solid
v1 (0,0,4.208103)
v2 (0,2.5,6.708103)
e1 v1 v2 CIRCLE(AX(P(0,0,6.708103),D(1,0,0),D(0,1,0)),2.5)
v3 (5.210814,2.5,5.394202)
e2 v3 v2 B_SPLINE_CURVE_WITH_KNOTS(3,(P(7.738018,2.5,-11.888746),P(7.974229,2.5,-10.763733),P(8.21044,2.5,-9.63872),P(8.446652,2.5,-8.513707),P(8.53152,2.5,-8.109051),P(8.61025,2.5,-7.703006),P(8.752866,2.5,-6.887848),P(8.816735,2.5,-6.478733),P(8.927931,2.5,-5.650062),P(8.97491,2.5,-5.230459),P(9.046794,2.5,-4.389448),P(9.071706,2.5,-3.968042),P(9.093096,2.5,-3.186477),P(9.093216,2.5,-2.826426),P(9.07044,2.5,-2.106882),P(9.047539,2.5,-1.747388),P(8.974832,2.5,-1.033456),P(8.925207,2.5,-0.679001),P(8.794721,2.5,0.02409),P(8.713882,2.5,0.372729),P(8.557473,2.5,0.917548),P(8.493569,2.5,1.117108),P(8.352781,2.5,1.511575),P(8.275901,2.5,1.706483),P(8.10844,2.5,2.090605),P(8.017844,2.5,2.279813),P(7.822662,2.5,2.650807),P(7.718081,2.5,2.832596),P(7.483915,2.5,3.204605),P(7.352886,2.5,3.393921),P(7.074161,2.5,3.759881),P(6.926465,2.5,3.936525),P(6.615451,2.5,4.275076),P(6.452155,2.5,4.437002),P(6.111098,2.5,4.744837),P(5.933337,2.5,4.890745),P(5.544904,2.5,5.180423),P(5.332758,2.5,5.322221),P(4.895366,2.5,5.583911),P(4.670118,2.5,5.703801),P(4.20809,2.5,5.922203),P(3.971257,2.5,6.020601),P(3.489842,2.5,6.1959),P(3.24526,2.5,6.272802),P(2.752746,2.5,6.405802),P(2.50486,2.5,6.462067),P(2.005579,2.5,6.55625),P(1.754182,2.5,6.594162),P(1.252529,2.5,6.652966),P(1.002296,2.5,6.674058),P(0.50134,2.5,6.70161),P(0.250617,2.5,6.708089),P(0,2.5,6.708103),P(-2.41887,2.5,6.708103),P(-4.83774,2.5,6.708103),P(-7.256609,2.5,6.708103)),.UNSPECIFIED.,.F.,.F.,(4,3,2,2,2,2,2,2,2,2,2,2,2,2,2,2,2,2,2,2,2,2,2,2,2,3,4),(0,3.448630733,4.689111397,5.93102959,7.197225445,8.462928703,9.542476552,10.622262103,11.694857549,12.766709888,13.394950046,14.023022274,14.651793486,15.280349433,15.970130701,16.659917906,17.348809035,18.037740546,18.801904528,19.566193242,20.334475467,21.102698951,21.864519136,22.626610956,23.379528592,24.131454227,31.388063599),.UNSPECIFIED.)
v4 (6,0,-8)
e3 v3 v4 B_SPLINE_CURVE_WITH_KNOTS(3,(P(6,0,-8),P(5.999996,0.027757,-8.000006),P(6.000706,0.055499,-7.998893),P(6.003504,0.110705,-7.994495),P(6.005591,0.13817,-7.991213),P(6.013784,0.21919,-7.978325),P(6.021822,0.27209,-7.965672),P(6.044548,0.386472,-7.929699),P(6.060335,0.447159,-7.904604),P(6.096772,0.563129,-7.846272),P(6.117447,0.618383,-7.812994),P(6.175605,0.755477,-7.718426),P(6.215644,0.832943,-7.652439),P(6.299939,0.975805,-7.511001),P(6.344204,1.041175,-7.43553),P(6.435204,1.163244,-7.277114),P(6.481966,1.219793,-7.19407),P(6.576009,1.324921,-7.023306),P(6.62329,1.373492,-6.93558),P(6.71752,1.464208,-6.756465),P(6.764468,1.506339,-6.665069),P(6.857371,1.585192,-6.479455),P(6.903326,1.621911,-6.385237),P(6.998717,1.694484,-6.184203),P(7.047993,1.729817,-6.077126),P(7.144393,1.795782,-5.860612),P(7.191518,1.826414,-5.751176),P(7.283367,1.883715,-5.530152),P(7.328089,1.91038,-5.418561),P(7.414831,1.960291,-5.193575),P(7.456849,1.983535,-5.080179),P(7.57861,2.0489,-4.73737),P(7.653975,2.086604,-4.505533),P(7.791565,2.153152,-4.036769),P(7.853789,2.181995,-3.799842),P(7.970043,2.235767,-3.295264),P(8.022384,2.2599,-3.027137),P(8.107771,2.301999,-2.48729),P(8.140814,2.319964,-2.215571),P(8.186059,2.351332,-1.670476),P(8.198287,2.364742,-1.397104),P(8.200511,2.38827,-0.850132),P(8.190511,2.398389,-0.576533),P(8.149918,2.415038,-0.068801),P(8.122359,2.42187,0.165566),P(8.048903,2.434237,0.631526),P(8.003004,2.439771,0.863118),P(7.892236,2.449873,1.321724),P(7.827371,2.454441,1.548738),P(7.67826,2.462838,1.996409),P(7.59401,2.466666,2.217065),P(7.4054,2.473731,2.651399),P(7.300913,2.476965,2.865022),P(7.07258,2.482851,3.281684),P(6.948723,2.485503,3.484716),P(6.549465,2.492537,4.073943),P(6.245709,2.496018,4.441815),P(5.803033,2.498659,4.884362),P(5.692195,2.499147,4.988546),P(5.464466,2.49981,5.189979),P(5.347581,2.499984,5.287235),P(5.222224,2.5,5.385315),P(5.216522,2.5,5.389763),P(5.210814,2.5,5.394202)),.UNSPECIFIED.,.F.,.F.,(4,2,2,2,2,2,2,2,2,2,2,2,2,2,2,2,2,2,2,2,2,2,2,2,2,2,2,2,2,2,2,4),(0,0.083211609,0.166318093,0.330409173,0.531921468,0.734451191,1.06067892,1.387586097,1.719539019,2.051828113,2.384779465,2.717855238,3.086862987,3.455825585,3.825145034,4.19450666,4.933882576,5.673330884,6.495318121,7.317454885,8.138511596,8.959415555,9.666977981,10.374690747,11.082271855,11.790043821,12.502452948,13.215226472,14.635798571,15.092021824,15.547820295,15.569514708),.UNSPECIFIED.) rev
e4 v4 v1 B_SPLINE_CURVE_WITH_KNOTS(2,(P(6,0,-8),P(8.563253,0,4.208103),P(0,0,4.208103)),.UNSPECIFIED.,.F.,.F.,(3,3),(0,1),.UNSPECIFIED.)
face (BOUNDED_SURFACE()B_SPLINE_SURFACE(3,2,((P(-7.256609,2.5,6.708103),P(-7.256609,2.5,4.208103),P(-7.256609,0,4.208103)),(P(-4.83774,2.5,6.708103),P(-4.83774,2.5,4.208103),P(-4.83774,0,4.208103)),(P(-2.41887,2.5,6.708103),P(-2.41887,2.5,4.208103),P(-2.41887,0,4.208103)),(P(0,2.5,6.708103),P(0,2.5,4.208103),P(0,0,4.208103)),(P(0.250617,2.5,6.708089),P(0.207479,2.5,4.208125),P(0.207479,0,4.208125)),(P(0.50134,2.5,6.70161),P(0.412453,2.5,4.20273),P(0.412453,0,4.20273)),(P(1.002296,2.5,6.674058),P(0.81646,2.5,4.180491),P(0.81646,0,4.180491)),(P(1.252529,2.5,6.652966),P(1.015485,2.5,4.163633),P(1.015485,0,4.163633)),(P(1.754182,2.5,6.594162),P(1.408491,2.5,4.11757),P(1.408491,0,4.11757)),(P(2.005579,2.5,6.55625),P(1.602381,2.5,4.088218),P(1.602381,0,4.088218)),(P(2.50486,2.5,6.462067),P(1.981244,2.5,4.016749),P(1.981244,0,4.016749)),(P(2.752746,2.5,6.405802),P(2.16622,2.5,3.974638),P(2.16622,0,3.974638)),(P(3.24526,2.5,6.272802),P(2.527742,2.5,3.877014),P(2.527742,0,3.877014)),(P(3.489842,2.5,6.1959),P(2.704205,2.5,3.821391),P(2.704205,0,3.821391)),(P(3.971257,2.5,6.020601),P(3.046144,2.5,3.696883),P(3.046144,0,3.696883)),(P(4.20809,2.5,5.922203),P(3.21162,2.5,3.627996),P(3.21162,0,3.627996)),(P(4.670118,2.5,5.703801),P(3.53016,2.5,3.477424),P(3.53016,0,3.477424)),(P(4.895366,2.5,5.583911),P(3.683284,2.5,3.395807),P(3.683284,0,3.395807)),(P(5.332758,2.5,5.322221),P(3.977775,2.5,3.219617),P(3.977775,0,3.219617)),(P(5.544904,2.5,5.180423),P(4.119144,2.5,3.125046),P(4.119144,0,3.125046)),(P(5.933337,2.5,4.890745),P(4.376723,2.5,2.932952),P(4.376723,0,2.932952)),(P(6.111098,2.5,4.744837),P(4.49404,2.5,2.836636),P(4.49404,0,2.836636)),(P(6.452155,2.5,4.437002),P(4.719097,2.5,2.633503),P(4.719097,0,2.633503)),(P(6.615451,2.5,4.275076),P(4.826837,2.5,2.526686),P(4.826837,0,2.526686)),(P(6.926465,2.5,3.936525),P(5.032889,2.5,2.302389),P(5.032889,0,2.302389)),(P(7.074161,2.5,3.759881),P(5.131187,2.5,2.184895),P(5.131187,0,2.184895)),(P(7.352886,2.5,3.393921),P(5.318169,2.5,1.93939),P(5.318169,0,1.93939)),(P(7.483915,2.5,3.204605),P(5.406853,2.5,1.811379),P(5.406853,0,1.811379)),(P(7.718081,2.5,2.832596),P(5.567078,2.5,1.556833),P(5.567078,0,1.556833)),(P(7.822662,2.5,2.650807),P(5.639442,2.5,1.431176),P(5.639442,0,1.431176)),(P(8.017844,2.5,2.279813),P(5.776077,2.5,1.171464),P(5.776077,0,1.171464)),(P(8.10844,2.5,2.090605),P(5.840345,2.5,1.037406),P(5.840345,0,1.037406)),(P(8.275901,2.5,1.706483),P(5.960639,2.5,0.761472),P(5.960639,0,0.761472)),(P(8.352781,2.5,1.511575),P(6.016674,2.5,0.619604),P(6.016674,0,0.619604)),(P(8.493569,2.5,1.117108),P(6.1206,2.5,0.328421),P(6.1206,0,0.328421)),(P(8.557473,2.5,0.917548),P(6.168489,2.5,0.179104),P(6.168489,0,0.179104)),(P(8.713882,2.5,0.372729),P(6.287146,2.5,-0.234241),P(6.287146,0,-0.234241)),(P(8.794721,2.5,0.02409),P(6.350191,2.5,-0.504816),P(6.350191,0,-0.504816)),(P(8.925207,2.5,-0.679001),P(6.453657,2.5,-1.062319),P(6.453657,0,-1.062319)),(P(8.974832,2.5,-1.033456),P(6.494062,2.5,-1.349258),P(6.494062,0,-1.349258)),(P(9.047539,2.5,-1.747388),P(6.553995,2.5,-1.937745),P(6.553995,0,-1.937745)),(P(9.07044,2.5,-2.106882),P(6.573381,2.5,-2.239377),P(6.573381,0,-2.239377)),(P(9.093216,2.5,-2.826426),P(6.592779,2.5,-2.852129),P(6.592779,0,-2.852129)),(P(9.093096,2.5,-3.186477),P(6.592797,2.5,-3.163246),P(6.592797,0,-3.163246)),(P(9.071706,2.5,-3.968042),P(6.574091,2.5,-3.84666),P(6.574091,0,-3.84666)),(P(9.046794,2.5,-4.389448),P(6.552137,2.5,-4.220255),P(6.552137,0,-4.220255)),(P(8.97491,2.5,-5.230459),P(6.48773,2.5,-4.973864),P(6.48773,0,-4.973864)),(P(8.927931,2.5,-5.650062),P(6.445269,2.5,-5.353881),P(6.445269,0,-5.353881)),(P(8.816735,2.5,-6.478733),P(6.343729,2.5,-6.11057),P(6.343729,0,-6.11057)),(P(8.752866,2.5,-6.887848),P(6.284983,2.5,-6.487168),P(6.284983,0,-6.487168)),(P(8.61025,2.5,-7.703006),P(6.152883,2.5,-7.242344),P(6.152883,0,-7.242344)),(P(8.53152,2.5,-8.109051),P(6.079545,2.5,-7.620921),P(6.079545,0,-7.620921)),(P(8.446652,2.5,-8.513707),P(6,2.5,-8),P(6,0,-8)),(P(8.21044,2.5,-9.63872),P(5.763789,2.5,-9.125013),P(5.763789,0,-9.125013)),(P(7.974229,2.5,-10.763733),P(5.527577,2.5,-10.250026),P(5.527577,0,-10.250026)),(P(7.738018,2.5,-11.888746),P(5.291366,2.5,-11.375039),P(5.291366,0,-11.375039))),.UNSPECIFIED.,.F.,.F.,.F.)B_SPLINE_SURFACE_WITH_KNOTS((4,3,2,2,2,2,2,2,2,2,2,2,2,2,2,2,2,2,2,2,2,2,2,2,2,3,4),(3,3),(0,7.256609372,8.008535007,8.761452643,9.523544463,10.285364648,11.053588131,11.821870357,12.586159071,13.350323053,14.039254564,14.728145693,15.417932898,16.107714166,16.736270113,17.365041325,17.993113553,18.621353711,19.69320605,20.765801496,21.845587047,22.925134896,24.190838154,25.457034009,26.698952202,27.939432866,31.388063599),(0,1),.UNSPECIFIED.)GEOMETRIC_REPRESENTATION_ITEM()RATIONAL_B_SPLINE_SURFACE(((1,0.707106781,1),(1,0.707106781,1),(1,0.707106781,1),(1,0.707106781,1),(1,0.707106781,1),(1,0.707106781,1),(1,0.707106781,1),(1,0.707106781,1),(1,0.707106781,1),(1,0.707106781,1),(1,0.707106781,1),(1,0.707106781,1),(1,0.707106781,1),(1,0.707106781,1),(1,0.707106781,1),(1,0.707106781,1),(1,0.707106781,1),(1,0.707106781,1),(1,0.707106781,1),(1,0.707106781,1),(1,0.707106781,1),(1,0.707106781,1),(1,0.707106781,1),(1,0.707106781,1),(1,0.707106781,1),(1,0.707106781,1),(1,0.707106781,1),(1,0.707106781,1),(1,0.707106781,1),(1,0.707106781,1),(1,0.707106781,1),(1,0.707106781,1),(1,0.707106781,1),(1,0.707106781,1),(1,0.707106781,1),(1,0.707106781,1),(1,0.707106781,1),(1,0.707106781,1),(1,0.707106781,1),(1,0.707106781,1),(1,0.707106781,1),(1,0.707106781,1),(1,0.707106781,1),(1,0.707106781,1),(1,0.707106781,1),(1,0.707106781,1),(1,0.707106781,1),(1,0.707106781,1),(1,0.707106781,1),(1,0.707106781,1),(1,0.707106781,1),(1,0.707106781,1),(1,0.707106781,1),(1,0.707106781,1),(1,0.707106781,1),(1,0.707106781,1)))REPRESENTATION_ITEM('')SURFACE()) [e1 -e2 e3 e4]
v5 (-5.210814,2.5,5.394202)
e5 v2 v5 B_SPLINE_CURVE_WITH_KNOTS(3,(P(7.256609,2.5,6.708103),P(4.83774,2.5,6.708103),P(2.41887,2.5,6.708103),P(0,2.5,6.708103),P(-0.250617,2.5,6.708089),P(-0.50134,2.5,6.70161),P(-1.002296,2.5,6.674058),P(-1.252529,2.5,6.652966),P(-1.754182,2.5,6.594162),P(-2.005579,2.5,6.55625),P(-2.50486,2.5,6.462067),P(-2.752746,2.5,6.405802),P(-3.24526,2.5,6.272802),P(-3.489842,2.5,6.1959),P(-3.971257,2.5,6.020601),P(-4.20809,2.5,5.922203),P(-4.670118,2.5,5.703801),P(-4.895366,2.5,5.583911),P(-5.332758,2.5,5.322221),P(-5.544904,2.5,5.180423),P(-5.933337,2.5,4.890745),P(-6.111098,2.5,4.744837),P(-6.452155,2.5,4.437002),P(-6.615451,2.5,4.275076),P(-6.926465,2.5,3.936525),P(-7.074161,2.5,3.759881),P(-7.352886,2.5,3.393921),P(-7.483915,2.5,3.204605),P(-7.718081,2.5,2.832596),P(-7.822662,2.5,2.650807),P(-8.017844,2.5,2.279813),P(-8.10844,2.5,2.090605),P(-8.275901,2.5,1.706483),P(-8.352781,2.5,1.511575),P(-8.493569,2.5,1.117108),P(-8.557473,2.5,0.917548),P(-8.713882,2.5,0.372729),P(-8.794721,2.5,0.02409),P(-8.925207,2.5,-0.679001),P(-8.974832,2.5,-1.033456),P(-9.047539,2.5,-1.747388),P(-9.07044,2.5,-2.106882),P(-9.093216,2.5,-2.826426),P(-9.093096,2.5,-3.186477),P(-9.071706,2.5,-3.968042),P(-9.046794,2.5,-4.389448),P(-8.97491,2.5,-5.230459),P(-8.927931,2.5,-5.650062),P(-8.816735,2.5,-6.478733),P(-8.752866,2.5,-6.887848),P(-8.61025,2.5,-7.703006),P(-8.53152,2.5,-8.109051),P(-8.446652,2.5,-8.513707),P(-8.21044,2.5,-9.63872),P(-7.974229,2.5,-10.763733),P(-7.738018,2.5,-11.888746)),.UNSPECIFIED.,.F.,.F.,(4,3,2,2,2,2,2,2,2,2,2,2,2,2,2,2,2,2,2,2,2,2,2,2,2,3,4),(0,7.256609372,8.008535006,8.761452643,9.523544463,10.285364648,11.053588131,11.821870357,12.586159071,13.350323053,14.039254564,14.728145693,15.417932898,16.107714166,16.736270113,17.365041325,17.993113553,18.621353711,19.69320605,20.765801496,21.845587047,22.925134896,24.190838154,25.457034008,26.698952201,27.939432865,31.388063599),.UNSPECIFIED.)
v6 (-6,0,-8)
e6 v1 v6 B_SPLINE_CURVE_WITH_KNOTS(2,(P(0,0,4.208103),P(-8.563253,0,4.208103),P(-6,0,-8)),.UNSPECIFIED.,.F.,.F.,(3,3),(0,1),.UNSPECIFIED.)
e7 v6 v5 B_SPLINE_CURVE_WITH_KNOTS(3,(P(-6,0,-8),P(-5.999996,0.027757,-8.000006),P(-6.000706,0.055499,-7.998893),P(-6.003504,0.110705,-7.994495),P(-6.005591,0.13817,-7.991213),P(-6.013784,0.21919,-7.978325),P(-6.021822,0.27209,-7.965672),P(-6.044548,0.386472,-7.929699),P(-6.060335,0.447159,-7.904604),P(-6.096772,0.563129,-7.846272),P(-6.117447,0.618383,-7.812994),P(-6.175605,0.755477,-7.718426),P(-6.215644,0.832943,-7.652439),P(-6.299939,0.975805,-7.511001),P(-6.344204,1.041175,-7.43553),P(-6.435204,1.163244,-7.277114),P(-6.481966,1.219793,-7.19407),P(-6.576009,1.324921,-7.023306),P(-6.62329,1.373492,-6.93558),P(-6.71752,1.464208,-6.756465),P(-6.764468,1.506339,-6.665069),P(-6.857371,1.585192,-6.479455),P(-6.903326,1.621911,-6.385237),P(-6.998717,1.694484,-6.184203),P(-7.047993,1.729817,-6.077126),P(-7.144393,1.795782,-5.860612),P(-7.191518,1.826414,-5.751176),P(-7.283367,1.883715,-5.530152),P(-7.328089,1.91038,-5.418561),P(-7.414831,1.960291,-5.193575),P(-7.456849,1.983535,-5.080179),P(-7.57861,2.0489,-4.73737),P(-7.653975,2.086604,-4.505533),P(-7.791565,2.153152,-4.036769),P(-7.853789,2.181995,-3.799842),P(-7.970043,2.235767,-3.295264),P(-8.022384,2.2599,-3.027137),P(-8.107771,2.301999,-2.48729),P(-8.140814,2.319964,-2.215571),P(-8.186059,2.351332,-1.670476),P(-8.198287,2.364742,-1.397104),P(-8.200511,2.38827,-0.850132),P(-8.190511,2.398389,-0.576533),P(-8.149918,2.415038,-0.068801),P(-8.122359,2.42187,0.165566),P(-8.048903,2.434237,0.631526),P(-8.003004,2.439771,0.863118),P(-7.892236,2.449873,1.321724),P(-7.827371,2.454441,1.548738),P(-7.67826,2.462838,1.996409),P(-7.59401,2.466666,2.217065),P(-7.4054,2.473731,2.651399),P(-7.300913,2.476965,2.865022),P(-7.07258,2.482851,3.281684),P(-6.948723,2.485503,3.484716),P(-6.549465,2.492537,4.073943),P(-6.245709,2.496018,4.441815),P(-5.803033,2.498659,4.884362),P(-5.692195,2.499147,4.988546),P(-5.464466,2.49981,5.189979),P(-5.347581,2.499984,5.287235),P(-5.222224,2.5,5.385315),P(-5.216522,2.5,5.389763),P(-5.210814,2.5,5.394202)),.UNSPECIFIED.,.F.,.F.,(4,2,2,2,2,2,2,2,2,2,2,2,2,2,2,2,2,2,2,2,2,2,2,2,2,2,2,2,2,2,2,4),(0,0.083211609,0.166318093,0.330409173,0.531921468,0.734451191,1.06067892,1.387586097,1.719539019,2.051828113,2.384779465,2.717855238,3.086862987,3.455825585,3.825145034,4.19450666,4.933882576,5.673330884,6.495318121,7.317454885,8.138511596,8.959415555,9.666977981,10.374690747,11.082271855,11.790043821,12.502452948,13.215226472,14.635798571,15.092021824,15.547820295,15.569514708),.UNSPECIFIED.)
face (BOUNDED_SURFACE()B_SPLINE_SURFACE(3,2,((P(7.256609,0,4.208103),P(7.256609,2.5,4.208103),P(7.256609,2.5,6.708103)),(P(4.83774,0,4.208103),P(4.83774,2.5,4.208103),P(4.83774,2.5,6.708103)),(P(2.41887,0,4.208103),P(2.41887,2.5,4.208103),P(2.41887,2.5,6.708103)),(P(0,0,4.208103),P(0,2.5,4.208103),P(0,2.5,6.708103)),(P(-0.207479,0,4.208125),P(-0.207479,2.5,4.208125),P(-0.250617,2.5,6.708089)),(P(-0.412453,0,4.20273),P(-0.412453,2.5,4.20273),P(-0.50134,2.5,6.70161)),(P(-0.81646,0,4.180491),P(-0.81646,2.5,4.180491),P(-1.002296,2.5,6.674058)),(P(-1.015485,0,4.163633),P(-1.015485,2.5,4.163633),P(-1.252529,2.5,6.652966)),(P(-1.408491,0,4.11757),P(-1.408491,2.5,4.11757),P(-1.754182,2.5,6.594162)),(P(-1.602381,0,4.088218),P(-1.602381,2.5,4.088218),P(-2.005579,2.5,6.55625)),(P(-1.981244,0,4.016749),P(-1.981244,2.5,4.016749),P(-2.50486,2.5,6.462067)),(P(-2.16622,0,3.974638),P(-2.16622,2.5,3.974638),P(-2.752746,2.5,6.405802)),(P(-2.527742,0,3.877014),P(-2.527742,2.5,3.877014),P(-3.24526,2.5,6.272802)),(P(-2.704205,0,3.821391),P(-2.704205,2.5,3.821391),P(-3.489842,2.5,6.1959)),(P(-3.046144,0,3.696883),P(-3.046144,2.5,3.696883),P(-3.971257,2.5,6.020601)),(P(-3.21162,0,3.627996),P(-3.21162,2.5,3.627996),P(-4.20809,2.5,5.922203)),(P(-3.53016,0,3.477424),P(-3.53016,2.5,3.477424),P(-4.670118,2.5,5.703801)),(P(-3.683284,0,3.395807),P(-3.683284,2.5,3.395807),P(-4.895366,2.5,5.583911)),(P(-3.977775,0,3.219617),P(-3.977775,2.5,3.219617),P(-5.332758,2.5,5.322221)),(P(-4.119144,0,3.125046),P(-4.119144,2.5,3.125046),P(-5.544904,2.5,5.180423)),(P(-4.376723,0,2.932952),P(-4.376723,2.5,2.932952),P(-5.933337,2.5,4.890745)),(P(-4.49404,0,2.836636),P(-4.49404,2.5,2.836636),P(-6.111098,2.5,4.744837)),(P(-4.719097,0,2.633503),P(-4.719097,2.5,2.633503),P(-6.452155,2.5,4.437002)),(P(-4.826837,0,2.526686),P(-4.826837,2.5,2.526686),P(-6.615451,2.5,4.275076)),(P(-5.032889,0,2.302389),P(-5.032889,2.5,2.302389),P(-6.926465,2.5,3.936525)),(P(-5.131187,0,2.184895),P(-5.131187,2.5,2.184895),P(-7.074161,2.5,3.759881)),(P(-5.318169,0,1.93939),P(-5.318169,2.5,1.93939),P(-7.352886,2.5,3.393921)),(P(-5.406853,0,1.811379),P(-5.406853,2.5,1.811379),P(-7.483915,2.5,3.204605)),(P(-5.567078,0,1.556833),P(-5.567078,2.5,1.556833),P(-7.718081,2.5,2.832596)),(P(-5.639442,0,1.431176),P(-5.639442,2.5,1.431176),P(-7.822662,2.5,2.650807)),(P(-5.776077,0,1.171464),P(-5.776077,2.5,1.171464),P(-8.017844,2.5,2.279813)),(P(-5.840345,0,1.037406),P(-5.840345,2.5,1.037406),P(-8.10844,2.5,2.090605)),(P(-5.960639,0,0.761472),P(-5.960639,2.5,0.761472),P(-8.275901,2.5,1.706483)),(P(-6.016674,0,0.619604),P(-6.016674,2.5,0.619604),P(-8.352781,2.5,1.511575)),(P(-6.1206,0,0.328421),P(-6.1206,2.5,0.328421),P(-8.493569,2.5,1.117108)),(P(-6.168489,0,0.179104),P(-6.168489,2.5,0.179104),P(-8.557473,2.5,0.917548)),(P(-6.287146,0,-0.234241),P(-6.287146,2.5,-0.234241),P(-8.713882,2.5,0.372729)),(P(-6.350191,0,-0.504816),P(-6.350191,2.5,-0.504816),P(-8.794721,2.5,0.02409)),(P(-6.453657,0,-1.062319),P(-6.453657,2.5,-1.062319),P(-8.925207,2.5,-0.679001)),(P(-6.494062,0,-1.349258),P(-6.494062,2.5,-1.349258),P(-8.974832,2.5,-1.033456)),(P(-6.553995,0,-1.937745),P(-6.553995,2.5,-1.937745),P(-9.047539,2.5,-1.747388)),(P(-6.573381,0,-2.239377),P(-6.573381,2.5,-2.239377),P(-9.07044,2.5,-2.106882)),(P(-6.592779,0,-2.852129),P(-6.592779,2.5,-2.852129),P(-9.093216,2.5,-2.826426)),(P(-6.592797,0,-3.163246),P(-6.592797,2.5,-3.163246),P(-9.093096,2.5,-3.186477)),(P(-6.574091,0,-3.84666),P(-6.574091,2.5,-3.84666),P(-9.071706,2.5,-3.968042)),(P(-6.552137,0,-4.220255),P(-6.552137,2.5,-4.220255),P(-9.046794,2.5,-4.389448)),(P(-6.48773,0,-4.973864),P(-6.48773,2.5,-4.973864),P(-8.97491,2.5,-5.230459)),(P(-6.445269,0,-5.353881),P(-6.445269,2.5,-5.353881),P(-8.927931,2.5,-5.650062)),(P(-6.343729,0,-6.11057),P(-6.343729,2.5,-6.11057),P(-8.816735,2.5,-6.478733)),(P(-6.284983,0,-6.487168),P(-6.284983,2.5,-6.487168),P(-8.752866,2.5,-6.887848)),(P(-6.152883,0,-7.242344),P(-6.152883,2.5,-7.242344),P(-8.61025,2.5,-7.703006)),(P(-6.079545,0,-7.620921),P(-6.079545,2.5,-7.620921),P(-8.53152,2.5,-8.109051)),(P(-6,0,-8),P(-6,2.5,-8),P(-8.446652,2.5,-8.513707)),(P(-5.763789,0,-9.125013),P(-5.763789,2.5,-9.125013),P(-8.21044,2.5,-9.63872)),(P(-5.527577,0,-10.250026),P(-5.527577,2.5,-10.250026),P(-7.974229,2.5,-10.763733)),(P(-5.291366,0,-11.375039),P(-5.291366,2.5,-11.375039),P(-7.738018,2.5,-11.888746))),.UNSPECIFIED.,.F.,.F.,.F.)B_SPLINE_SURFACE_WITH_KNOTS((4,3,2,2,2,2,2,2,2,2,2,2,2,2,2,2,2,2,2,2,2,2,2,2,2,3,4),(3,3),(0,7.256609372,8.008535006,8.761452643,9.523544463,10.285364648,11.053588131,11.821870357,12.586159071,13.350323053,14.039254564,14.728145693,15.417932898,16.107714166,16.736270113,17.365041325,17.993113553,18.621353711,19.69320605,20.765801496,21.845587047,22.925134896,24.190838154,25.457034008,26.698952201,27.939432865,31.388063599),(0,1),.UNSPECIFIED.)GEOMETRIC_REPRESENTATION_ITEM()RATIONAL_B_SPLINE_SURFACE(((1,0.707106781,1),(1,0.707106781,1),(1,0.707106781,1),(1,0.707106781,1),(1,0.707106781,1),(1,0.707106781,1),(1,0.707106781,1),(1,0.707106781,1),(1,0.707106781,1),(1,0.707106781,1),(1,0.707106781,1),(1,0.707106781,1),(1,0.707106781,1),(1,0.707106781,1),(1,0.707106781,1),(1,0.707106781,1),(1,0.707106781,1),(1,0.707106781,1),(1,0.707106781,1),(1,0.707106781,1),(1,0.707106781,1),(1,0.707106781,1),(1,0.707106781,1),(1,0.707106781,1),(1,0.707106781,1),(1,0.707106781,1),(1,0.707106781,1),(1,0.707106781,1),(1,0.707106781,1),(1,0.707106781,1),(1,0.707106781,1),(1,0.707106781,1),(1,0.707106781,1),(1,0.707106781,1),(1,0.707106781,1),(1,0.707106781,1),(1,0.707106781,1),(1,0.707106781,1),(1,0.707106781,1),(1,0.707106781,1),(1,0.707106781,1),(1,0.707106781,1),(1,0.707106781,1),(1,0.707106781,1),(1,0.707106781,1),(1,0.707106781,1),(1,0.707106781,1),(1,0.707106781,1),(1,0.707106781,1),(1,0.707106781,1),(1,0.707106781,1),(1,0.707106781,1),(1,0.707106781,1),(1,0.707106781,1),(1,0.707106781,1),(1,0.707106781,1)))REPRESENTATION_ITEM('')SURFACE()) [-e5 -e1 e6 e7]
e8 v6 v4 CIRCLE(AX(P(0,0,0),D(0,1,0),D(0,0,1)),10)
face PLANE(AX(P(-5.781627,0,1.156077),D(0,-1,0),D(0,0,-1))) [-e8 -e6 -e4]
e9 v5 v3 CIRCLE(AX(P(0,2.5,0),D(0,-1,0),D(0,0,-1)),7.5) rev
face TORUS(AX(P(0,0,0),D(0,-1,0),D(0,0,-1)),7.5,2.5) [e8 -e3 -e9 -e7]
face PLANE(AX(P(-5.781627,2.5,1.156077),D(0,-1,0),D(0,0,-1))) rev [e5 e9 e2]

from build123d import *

# Parameters (mm, degrees)
BOSS_EXTRUDE1_DEPTH = 2.5
FILLET1_R           = 2.5


with BuildPart() as part:
    # Sketch1 → Boss-Extrude1 (new body)
    with BuildSketch(Plane(origin=(0, 0, 0), x_dir=(1, 0, 0), z_dir=(0, 1, 0))):
        with BuildLine():
            ThreePointArc((-6, 8), (0, -10), (6, 8))
            add(Edge.make_bspline(
                [(6, 8), (8.563253163, -4.208102808), (0, -4.208102808)],
                knots=[0, 0, 0, 1, 1, 1], degree=2))
            add(Edge.make_bspline(
                [(-6, 8), (-8.563253163, -4.208102808), (0, -4.208102808)],
                knots=[0, 0, 0, 1, 1, 1], degree=2))
        make_face()
    extrude(amount=BOSS_EXTRUDE1_DEPTH)

    # Fillet1
    fillet1_edges = [part.edges().sort_by_distance(p)[0] for p in [
        (0, 2.5, 10),
        (5.781626582, 2.5, 1.156077106),
        (-5.781626582, 2.5, 1.156077106),
    ]]
    fillet(fillet1_edges, radius=FILLET1_R - 0.0001)  # a hair under: the kernel refuses the full size


solid = part.part
